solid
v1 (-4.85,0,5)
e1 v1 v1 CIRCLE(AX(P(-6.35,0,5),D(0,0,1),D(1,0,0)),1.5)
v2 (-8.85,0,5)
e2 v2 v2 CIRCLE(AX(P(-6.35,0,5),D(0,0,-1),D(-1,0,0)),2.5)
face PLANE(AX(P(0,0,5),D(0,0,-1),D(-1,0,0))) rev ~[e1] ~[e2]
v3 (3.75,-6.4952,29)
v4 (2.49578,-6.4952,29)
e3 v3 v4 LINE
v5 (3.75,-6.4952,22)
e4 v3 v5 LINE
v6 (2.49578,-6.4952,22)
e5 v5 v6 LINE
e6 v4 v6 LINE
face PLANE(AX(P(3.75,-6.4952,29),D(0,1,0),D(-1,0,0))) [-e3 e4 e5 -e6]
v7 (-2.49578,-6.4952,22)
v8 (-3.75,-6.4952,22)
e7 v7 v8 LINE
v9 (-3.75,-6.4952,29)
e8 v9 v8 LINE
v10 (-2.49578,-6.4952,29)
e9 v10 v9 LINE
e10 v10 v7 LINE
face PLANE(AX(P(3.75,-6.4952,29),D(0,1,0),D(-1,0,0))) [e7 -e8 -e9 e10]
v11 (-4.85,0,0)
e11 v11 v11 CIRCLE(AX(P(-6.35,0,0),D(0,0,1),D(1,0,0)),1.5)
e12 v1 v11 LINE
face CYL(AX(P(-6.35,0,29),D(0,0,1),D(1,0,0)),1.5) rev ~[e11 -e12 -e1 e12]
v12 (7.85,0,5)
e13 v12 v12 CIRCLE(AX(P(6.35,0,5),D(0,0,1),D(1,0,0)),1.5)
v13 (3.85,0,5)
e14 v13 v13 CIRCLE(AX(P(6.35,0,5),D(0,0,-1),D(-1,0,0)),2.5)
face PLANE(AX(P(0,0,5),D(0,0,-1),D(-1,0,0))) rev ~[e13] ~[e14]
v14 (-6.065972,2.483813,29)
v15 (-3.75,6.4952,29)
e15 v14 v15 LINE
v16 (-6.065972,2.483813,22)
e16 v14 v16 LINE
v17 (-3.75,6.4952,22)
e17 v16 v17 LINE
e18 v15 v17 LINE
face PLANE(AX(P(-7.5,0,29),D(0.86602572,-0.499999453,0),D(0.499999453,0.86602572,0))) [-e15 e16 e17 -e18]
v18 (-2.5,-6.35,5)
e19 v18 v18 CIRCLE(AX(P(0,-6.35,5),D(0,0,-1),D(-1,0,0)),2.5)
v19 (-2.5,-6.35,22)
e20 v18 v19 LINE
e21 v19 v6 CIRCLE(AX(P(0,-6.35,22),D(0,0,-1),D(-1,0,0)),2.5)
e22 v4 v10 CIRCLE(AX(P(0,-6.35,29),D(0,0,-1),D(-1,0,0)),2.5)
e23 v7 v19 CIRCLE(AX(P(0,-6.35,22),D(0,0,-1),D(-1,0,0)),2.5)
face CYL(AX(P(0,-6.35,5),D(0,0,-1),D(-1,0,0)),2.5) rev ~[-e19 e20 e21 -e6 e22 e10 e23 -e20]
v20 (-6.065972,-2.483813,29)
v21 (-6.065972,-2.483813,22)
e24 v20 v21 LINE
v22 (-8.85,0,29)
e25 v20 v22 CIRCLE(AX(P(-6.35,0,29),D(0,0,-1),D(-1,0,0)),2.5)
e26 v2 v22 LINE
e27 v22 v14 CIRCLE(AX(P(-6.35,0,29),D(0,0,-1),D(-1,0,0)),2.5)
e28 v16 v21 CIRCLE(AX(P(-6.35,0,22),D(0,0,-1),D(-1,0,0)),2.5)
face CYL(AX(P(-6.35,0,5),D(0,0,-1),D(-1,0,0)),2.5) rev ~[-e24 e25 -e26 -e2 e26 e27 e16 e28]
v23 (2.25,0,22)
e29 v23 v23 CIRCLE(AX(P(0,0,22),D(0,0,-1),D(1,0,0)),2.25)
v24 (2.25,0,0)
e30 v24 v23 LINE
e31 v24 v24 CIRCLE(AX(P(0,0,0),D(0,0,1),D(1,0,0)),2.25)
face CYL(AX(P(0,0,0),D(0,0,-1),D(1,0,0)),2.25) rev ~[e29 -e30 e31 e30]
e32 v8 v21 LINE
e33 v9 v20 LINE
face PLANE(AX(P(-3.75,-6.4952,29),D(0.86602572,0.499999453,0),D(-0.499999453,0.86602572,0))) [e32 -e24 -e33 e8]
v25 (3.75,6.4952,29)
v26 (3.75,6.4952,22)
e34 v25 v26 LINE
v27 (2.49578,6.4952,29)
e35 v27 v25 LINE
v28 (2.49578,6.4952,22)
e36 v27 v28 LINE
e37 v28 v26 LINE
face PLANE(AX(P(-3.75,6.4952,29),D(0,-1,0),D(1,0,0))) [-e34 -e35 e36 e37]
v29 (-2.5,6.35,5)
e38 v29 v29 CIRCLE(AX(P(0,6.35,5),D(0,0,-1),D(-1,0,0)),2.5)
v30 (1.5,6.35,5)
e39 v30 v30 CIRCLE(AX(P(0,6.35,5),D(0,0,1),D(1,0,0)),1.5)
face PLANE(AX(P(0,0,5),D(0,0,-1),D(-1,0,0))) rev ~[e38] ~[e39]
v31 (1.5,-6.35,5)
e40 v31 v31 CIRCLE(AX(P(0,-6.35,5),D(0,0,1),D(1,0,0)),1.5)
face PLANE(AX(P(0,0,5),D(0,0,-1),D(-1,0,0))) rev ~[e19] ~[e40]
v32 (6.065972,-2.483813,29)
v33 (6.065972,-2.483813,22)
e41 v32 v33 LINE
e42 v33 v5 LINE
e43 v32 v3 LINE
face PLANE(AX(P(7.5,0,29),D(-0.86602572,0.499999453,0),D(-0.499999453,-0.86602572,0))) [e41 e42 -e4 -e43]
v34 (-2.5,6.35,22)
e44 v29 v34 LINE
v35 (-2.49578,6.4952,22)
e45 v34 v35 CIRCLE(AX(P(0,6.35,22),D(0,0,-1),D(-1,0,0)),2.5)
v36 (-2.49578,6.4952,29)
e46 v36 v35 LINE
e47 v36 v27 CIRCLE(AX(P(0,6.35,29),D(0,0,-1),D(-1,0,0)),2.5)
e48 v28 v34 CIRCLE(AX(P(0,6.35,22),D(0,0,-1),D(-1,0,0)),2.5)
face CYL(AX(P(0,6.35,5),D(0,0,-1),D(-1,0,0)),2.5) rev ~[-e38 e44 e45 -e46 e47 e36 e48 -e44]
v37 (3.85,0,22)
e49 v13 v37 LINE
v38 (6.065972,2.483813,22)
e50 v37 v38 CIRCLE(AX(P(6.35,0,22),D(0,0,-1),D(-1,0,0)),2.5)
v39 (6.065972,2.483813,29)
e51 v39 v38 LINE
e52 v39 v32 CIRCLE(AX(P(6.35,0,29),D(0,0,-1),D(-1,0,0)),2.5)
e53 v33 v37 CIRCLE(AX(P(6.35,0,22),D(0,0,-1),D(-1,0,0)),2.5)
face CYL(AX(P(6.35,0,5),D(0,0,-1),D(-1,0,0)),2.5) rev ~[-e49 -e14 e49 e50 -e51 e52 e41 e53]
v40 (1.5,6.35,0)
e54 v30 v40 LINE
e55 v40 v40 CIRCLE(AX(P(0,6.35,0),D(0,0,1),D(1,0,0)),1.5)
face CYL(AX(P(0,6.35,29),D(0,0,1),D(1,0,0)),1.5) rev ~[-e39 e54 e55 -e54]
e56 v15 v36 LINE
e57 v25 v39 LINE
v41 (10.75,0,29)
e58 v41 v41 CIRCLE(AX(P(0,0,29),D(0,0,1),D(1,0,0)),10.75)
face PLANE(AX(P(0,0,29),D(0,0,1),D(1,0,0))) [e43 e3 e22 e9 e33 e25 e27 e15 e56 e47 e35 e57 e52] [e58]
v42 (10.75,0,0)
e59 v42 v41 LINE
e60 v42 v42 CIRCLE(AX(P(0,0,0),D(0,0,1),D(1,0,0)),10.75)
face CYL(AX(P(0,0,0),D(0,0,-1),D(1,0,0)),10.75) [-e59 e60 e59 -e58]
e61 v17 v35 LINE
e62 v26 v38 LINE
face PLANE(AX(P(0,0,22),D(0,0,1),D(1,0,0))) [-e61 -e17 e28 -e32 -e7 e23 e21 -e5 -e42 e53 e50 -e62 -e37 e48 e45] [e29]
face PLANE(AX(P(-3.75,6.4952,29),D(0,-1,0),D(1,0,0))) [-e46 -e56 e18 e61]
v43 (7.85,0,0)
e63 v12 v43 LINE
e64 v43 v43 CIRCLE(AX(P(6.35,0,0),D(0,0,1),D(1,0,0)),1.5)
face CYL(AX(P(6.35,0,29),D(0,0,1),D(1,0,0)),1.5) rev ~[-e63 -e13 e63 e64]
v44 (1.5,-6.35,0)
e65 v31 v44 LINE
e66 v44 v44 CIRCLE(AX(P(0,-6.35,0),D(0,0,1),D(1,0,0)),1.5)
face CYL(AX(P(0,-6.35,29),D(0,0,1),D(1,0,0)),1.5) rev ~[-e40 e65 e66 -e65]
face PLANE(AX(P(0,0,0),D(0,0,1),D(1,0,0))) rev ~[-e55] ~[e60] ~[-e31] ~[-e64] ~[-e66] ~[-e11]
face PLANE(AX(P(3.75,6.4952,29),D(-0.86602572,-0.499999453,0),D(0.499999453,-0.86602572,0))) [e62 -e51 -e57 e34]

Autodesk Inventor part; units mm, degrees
ref_plane "YZ Plane" through (0, 0, 0) normal (1, 0, 0) x (0, 1, 0)
ref_plane "XZ Plane" through (0, 0, 0) normal (0, 1, 0) x (-1, 0, 0)
sketch "Sketch1" plane through (0, 0, 0) normal (0, 0, 1) x (1, 0, 0)
  circle A0 centre (0, 0) radius 10.75
  circle A1 centre (0, 0) radius 2.25
  dimension "d0" = 21.5
  dimension "d1" = 4.5
extrude "Extrusion1" add sketch "Sketch1" along normal blind 29
sketch "Sketch2" plane through (0, 0, 29) normal (0, 0, 1) x (1, 0, 0)
  line L0 (7.5, 0) -> (3.75, -6.4952)
  line L1 (3.75, -6.4952) -> (-3.75, -6.4952)
  line L2 (-3.75, -6.4952) -> (-7.5, 0)
  line L3 (-7.5, 0) -> (-3.75, 6.4952)
  line L4 (-3.75, 6.4952) -> (3.75, 6.4952)
  line L5 (3.75, 6.4952) -> (7.5, 0)
  point P0 (0, 0)
  point P1 (0, 0)
  dimension "d4" = 15
extrude "Extrusion2" cut sketch "Sketch2" against normal blind 7
sketch "Sketch9" plane through (0, 0, 29) normal (0, 0, 1) x (1, 0, 0)
  circle A0 centre (0, -6.35) radius 1.5
  circle A1 centre (0, 6.35) radius 1.5
  line L0 (0, 6.35) -> (0, -6.35) construction
  circle A2 centre (6.35, 0) radius 1.5
  circle A3 centre (-6.35, 0) radius 1.5
  line L1 (-6.35, 0) -> (6.35, 0) construction
  point P0 (0, 0)
  point P1 (0, 0)
  dimension "d19" = 3
  dimension "d20" = 3
  dimension "d21" = 12.7
  dimension "d22" = 3
  dimension "d23" = 3
  dimension "d24" = 12.7
extrude "Extrusion6" cut sketch "Sketch9" against normal through all
ref_plane "Work Plane2" through (0, 0, 5) normal (0, 0, -1) x (-1, 0, 0)
sketch "Sketch11" plane through (0, 0, 5) normal (0, 0, -1) x (-1, 0, 0)
  circle A0 centre (-6.35, 0) radius 1.5 projected
  spline S0 degree 2 poles (-1.5, 6.35) (-1.5, 8.9481) (0.75, 7.649) (3, 6.35) (0.75, 5.051) (-1.5, 3.7519) (-1.5, 6.35) knots 0 0 0 0.333333 0.333333 0.666667 0.666667 1 1 1 weights 1 0.5 1 0.5 1 0.5 1 projected
  circle A1 centre (6.35, 0) radius 1.5 projected
  circle A2 centre (-6.35, 0) radius 2.5
  circle A3 centre (0, 6.35) radius 1.5 projected
  circle A4 centre (0, 6.35) radius 2.5
  circle A5 centre (6.35, 0) radius 2.5
  circle A6 centre (0, -6.35) radius 1.5 projected
  circle A7 centre (0, -6.35) radius 2.5
  point P0 (0, 0)
  dimension "d32" = 5
  dimension "d33" = 5
  dimension "d34" = 5
  dimension "d35" = 5
extrude "Extrusion7" cut sketch "Sketch11" against normal through all contours A0 | S0 | A1 | A2 | A4 | A5 | A6 | A7
properties part number "AA032" material "ABS Plastic"
